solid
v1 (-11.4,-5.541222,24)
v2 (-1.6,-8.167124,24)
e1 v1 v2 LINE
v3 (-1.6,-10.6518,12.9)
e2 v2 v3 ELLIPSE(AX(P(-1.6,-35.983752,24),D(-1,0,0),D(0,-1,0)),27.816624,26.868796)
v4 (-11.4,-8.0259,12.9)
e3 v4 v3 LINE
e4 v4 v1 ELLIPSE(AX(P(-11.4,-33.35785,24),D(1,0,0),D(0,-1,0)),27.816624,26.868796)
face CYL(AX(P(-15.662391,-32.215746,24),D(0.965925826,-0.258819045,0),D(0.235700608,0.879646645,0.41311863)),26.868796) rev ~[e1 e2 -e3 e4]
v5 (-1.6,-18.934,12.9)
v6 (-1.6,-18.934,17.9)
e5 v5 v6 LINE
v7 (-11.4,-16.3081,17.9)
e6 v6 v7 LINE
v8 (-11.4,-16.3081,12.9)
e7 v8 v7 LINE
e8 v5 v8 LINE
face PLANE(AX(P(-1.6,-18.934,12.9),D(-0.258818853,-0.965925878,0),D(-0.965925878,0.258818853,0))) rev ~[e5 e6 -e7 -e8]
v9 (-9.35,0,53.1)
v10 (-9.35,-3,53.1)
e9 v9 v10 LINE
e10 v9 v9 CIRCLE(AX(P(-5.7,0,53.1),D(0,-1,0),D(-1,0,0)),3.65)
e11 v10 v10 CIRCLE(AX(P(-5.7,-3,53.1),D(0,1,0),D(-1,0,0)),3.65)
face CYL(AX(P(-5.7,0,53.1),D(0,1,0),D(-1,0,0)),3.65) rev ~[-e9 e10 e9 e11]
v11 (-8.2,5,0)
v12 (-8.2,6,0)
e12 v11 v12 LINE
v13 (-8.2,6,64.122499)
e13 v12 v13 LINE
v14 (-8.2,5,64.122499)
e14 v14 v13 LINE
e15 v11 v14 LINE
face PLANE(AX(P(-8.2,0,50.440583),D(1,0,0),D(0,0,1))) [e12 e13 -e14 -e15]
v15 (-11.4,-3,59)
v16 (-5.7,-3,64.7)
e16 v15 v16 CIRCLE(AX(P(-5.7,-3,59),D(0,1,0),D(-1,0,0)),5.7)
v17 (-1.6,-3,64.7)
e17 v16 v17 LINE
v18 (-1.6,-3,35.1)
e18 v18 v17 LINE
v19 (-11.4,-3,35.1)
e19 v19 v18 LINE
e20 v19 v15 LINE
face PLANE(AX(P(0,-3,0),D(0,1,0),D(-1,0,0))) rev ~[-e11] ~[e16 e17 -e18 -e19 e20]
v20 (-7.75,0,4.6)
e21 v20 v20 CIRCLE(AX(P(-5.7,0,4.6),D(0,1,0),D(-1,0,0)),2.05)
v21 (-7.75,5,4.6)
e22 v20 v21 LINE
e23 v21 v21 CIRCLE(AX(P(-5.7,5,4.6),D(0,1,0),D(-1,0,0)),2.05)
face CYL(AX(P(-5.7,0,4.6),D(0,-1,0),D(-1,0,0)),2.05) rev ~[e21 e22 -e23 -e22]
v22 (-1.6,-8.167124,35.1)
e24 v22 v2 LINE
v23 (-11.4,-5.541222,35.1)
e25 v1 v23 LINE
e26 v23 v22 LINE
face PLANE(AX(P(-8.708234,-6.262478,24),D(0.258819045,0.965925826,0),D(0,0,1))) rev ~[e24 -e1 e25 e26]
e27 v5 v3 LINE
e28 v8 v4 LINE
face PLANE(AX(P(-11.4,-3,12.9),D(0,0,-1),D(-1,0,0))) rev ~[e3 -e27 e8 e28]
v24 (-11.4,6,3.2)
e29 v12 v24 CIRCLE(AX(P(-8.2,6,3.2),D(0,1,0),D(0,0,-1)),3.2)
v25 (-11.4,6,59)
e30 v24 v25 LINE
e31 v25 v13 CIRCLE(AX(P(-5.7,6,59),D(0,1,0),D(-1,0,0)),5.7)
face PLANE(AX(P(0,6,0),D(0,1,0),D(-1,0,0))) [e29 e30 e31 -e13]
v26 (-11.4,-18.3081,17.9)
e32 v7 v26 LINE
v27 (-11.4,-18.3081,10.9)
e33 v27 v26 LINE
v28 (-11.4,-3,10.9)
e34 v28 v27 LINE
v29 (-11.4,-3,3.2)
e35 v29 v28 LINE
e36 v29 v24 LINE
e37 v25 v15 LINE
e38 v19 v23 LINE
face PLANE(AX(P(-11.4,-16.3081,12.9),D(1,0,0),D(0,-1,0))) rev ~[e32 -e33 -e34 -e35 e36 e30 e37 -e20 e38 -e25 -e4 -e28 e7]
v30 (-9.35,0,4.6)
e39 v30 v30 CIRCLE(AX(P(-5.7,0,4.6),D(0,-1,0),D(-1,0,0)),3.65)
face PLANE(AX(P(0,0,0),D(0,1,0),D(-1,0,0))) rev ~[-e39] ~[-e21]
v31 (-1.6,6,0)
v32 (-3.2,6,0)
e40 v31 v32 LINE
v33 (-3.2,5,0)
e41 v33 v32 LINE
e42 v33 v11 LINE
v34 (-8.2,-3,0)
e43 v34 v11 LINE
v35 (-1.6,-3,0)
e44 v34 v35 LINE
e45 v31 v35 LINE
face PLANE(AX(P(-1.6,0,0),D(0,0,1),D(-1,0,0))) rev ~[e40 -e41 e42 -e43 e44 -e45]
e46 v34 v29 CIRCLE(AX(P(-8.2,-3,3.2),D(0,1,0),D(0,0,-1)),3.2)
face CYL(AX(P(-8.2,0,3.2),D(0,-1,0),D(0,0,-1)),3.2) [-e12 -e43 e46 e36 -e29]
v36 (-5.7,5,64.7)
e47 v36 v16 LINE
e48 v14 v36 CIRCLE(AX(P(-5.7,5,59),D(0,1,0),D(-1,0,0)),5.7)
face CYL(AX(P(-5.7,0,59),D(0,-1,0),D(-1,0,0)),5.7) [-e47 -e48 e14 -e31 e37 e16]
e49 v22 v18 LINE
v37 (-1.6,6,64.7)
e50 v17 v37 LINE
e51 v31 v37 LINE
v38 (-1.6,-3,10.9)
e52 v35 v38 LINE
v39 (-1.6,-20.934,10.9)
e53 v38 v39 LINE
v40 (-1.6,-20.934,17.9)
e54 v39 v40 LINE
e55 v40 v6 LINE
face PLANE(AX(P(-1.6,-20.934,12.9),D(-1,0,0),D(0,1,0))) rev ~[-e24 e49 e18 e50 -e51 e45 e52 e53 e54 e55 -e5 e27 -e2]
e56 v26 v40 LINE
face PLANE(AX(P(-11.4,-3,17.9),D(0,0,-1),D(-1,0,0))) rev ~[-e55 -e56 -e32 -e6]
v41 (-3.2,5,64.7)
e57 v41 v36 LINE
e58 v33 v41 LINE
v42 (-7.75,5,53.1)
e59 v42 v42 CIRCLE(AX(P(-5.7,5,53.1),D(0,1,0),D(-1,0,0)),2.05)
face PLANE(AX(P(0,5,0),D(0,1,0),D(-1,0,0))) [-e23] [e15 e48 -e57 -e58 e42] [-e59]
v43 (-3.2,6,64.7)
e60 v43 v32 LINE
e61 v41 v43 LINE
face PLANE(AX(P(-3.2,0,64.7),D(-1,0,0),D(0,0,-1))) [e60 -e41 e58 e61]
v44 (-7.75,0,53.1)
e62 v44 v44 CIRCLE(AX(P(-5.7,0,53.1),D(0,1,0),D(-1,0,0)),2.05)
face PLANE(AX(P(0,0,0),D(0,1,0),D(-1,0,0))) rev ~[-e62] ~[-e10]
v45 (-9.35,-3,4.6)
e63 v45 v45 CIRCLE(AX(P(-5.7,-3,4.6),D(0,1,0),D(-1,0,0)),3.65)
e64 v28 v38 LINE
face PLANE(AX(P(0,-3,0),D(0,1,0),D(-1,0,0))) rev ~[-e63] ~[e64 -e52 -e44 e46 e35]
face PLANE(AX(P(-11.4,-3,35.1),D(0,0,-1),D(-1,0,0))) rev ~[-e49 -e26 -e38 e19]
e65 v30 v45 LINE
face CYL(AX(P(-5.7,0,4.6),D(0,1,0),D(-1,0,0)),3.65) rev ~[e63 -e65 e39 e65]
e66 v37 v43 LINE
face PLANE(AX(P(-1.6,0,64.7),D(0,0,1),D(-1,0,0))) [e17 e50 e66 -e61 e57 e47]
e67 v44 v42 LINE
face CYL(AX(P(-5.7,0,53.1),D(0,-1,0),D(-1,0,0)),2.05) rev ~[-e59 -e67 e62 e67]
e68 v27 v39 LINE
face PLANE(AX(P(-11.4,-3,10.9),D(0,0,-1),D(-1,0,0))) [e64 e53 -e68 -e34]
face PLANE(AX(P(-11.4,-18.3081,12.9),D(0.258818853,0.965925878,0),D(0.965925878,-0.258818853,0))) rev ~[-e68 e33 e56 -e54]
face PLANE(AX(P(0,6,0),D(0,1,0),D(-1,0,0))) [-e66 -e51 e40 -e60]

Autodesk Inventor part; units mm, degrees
ref_plane "YZ Plane" through (0, 0, 0) normal (1, 0, 0) x (0, 1, 0)
sketch "Sketch1" plane through (0, 0, 0) normal (0, 1, 0) x (-1, 0, 0)
  line L0 (0, 64.7) -> (11.4, 64.7) construction
  line L1 (11.4, 64.7) -> (11.4, 0) construction
  line L2 (11.4, 0) -> (0, 0) construction
  line L3 (0, 0) -> (0, 64.7) construction
  line L4 (5.7, 64.7) -> (5.7, 0) construction
  line L5 (11.4, 32.35) -> (0, 32.35) construction
  circle A0 centre (5.7, 53.1) radius 1.6 construction
  circle A1 centre (5.7, 53.1) radius 2.05
  circle A2 centre (5.7, 43.4) radius 1.6 construction
  circle A3 centre (5.7, 43.4) radius 2.05 construction
  circle A4 centre (5.7, 33.7) radius 1.6 construction
  circle A5 centre (5.7, 33.7) radius 2.05 construction
  circle A6 centre (5.7, 24) radius 1.6 construction
  circle A7 centre (5.7, 24) radius 2.05 construction
  circle A8 centre (5.7, 14.3) radius 1.6 construction
  circle A9 centre (5.7, 14.3) radius 2.05 construction
  circle A10 centre (5.7, 4.6) radius 1.6 construction
  circle A11 centre (5.7, 4.6) radius 2.05
  line L6 (8.2, 64.7) -> (3.2, 64.7) construction
  line L7 (3.2, 64.7) -> (3.2, 0)
  line L8 (3.2, 0) -> (8.2, 0) construction
  line L9 (8.2, 0) -> (8.2, 64.7)
  circle A12 centre (5.7, 53.1) radius 2.5 construction
  circle A13 centre (5.7, 59) radius 5.7 construction
  circle A14 centre (8.2, 3.2) radius 3.2 construction
  line L10 (0, 0) -> (3.2, 0) construction
  line L11 (1.6, 0) -> (1.6, 64.7)
  circle A15 centre (5.7, 4.6) radius 3.65
  circle A16 centre (5.7, 14.3) radius 3.65 construction
  circle A17 centre (5.7, 24) radius 3.65 construction
  circle A18 centre (5.7, 33.7) radius 3.65 construction
  circle A19 centre (5.7, 43.4) radius 3.65 construction
  circle A20 centre (5.7, 53.1) radius 3.65
  arc A21 (8.2, 0) -> (11.4, 3.2) centre (8.2, 3.2) ccw
  arc A22 (11.4, 59) -> (5.7, 64.7) centre (5.7, 59) ccw
  line L12 (11.4, 3.2) -> (11.4, 59)
  line L13 (1.6, 0) -> (8.2, 0)
  line L14 (1.6, 64.7) -> (5.7, 64.7)
  point P0 (5.7, 54.7)
  point P1 (5.7, 3)
  point P2 (-5.6396, 32.0975)
  point P3 (-5.6396, -32.6025)
  point P4 (-1.0396, 31.5935)
  point P5 (8.2, 64.1225)
  point P6 (8.2, 55.7594)
  point P7 (8.2, 50.4406)
  point P8 (3.2, 0)
  point P9 (3.2, 50.4406)
  point P10 (3.2, 55.7594)
  dimension "d4" = 3.2
  dimension "d5" = 4.1
  dimension "d6" = 9.7
  dimension "d7" = 6.5
  dimension "d8" = 10
  dimension "d9" = 3
  dimension "d10" = 0.9
  dimension "d11" = 3.2
  dimension "d12" = 7.3
extrude "Extrusion1" add sketch "Sketch1" along normal blind 6 contours L7 A20 A15 L13 L11 L14 | L7 A20 | A20 L9 | L9 A22 L12 A21 A15 A20 | L7 A15 | A15 L9
extrude "Extrusion2" add sketch "Sketch1" along normal blind 5 contours L14 A22 L9 A20 L7 | A20 L9 L7 | A20 L9 A15 L7 | A15 L9 L7 | L7 A15 L9 L13
extrude "Extrusion3" add sketch "Sketch1" against normal blind 3 contours L14 A22 L9 A20 L7 | L7 A20 A15 L13 L11 L14 | A20 L9 A15 L7 | L9 A22 L12 A21 A15 A20 | L7 A15 L9 L13
sketch "Sketch2" plane through (0, -3, 0) normal (0, -1, 0) x (1, 0, 0)
  line L0 (-5.7, 53.1) -> (-5.7, 4.6) construction
  circle A0 centre (-5.7, 53.1) radius 4.85 construction
  circle A1 centre (-5.7, 43.4) radius 4.85 construction
  circle A2 centre (-5.7, 33.7) radius 4.85 construction
  circle A3 centre (-5.7, 24) radius 4.85 construction
  circle A4 centre (-5.7, 14.3) radius 4.85 construction
  circle A5 centre (-5.7, 4.6) radius 4.85 construction
  line L1 (-11.4, 3.2) -> (-11.4, 59) construction
  line L2 (0, 35.1) -> (-11.4, 35.1) construction
  line L3 (-11.4, 35.1) -> (-11.4, 12.9) construction
  line L4 (-11.4, 12.9) -> (0, 12.9) construction
  line L5 (0, 12.9) -> (0, 35.1) construction
  line L6 (0, 35.1) -> (-11.4, 12.9) construction
  line L7 (-11.4, 35.1) -> (0, 12.9) construction
  point P0 (0, 0)
  dimension "d20" = 22.2
ref_plane "Work Plane1" through (-11.4, -3, 12.9) normal (0, 0, -1) x (-1, 0, 0)
sketch "Sketch3" plane through (-11.4, -3, 12.9) normal (0, 0, -1) x (-1, 0, 0)
  line L0 (0, 0) -> (-9.8, 0)
  line L1 (0, 0) -> (9.8, 0) construction
  line L2 (9.8, 0) -> (9.8, -2.4) construction
  line L3 (0, 0) -> (0, -15.3081)
  line L4 (0, -15.3081) -> (-9.8, -17.934)
  line L5 (-9.8, -17.934) -> (-9.8, 0)
  line L6 (-9.8, -15.934) -> (0, -13.3081)
  line L7 (9.8, -2.4) -> (0, -5.0259) construction
  line L8 (0, -5.0259) -> (-9.8, -7.6518)
  line L9 (9.8, -2.4) -> (0, -2.4) construction
  line L10 (0, -13.3081) -> (-2.0706, -5.5807) construction
  point P0 (-11.4, 3)
  dimension "d32" = 2.4
  dimension "d34" = 15
  dimension "d35" = 8
  dimension "d36" = 2
extrude "Extrusion4" add sketch "Sketch3" along normal blind 2
extrude "Extrusion5" add sketch "Sketch3" against normal blind 22.2 contours L3 L8 L5 L0
extrude "Extrusion6" add sketch "Sketch3" against normal blind 5 contours L3 L4 L5 L6
ref_plane "Work Plane3" through (-9.3294, -8.5807, 12.9) normal (-0.9659258, 0.258819, 0) x (-0.258819, -0.9659258, 0)
sketch "Sketch5" plane through (-9.3294, -8.5807, 12.9) normal (-0.9659258, 0.258819, 0) x (-0.258819, -0.9659258, 0)
  line L0 (0, 0) -> (0, 22.2) projected
  arc A0 (0, 22.2) -> (0, 0) centre (24.4688, 11.1) ccw
  line L1 (-2.4, 11.1) -> (-2.4, 22.2)
  line L2 (-2.4, 22.2) -> (0, 22.2)
  line L3 (-4.8546, 22.2) -> (0, 22.2) projected
  point P0 (-10.703, -12.9)
  point P1 (0, 11.1)
  dimension "d37" = 2.4
extrude "Extrusion7" cut sketch "Sketch5" along normal through all both and the other way through all
properties part number "Right-Brush-Top"
